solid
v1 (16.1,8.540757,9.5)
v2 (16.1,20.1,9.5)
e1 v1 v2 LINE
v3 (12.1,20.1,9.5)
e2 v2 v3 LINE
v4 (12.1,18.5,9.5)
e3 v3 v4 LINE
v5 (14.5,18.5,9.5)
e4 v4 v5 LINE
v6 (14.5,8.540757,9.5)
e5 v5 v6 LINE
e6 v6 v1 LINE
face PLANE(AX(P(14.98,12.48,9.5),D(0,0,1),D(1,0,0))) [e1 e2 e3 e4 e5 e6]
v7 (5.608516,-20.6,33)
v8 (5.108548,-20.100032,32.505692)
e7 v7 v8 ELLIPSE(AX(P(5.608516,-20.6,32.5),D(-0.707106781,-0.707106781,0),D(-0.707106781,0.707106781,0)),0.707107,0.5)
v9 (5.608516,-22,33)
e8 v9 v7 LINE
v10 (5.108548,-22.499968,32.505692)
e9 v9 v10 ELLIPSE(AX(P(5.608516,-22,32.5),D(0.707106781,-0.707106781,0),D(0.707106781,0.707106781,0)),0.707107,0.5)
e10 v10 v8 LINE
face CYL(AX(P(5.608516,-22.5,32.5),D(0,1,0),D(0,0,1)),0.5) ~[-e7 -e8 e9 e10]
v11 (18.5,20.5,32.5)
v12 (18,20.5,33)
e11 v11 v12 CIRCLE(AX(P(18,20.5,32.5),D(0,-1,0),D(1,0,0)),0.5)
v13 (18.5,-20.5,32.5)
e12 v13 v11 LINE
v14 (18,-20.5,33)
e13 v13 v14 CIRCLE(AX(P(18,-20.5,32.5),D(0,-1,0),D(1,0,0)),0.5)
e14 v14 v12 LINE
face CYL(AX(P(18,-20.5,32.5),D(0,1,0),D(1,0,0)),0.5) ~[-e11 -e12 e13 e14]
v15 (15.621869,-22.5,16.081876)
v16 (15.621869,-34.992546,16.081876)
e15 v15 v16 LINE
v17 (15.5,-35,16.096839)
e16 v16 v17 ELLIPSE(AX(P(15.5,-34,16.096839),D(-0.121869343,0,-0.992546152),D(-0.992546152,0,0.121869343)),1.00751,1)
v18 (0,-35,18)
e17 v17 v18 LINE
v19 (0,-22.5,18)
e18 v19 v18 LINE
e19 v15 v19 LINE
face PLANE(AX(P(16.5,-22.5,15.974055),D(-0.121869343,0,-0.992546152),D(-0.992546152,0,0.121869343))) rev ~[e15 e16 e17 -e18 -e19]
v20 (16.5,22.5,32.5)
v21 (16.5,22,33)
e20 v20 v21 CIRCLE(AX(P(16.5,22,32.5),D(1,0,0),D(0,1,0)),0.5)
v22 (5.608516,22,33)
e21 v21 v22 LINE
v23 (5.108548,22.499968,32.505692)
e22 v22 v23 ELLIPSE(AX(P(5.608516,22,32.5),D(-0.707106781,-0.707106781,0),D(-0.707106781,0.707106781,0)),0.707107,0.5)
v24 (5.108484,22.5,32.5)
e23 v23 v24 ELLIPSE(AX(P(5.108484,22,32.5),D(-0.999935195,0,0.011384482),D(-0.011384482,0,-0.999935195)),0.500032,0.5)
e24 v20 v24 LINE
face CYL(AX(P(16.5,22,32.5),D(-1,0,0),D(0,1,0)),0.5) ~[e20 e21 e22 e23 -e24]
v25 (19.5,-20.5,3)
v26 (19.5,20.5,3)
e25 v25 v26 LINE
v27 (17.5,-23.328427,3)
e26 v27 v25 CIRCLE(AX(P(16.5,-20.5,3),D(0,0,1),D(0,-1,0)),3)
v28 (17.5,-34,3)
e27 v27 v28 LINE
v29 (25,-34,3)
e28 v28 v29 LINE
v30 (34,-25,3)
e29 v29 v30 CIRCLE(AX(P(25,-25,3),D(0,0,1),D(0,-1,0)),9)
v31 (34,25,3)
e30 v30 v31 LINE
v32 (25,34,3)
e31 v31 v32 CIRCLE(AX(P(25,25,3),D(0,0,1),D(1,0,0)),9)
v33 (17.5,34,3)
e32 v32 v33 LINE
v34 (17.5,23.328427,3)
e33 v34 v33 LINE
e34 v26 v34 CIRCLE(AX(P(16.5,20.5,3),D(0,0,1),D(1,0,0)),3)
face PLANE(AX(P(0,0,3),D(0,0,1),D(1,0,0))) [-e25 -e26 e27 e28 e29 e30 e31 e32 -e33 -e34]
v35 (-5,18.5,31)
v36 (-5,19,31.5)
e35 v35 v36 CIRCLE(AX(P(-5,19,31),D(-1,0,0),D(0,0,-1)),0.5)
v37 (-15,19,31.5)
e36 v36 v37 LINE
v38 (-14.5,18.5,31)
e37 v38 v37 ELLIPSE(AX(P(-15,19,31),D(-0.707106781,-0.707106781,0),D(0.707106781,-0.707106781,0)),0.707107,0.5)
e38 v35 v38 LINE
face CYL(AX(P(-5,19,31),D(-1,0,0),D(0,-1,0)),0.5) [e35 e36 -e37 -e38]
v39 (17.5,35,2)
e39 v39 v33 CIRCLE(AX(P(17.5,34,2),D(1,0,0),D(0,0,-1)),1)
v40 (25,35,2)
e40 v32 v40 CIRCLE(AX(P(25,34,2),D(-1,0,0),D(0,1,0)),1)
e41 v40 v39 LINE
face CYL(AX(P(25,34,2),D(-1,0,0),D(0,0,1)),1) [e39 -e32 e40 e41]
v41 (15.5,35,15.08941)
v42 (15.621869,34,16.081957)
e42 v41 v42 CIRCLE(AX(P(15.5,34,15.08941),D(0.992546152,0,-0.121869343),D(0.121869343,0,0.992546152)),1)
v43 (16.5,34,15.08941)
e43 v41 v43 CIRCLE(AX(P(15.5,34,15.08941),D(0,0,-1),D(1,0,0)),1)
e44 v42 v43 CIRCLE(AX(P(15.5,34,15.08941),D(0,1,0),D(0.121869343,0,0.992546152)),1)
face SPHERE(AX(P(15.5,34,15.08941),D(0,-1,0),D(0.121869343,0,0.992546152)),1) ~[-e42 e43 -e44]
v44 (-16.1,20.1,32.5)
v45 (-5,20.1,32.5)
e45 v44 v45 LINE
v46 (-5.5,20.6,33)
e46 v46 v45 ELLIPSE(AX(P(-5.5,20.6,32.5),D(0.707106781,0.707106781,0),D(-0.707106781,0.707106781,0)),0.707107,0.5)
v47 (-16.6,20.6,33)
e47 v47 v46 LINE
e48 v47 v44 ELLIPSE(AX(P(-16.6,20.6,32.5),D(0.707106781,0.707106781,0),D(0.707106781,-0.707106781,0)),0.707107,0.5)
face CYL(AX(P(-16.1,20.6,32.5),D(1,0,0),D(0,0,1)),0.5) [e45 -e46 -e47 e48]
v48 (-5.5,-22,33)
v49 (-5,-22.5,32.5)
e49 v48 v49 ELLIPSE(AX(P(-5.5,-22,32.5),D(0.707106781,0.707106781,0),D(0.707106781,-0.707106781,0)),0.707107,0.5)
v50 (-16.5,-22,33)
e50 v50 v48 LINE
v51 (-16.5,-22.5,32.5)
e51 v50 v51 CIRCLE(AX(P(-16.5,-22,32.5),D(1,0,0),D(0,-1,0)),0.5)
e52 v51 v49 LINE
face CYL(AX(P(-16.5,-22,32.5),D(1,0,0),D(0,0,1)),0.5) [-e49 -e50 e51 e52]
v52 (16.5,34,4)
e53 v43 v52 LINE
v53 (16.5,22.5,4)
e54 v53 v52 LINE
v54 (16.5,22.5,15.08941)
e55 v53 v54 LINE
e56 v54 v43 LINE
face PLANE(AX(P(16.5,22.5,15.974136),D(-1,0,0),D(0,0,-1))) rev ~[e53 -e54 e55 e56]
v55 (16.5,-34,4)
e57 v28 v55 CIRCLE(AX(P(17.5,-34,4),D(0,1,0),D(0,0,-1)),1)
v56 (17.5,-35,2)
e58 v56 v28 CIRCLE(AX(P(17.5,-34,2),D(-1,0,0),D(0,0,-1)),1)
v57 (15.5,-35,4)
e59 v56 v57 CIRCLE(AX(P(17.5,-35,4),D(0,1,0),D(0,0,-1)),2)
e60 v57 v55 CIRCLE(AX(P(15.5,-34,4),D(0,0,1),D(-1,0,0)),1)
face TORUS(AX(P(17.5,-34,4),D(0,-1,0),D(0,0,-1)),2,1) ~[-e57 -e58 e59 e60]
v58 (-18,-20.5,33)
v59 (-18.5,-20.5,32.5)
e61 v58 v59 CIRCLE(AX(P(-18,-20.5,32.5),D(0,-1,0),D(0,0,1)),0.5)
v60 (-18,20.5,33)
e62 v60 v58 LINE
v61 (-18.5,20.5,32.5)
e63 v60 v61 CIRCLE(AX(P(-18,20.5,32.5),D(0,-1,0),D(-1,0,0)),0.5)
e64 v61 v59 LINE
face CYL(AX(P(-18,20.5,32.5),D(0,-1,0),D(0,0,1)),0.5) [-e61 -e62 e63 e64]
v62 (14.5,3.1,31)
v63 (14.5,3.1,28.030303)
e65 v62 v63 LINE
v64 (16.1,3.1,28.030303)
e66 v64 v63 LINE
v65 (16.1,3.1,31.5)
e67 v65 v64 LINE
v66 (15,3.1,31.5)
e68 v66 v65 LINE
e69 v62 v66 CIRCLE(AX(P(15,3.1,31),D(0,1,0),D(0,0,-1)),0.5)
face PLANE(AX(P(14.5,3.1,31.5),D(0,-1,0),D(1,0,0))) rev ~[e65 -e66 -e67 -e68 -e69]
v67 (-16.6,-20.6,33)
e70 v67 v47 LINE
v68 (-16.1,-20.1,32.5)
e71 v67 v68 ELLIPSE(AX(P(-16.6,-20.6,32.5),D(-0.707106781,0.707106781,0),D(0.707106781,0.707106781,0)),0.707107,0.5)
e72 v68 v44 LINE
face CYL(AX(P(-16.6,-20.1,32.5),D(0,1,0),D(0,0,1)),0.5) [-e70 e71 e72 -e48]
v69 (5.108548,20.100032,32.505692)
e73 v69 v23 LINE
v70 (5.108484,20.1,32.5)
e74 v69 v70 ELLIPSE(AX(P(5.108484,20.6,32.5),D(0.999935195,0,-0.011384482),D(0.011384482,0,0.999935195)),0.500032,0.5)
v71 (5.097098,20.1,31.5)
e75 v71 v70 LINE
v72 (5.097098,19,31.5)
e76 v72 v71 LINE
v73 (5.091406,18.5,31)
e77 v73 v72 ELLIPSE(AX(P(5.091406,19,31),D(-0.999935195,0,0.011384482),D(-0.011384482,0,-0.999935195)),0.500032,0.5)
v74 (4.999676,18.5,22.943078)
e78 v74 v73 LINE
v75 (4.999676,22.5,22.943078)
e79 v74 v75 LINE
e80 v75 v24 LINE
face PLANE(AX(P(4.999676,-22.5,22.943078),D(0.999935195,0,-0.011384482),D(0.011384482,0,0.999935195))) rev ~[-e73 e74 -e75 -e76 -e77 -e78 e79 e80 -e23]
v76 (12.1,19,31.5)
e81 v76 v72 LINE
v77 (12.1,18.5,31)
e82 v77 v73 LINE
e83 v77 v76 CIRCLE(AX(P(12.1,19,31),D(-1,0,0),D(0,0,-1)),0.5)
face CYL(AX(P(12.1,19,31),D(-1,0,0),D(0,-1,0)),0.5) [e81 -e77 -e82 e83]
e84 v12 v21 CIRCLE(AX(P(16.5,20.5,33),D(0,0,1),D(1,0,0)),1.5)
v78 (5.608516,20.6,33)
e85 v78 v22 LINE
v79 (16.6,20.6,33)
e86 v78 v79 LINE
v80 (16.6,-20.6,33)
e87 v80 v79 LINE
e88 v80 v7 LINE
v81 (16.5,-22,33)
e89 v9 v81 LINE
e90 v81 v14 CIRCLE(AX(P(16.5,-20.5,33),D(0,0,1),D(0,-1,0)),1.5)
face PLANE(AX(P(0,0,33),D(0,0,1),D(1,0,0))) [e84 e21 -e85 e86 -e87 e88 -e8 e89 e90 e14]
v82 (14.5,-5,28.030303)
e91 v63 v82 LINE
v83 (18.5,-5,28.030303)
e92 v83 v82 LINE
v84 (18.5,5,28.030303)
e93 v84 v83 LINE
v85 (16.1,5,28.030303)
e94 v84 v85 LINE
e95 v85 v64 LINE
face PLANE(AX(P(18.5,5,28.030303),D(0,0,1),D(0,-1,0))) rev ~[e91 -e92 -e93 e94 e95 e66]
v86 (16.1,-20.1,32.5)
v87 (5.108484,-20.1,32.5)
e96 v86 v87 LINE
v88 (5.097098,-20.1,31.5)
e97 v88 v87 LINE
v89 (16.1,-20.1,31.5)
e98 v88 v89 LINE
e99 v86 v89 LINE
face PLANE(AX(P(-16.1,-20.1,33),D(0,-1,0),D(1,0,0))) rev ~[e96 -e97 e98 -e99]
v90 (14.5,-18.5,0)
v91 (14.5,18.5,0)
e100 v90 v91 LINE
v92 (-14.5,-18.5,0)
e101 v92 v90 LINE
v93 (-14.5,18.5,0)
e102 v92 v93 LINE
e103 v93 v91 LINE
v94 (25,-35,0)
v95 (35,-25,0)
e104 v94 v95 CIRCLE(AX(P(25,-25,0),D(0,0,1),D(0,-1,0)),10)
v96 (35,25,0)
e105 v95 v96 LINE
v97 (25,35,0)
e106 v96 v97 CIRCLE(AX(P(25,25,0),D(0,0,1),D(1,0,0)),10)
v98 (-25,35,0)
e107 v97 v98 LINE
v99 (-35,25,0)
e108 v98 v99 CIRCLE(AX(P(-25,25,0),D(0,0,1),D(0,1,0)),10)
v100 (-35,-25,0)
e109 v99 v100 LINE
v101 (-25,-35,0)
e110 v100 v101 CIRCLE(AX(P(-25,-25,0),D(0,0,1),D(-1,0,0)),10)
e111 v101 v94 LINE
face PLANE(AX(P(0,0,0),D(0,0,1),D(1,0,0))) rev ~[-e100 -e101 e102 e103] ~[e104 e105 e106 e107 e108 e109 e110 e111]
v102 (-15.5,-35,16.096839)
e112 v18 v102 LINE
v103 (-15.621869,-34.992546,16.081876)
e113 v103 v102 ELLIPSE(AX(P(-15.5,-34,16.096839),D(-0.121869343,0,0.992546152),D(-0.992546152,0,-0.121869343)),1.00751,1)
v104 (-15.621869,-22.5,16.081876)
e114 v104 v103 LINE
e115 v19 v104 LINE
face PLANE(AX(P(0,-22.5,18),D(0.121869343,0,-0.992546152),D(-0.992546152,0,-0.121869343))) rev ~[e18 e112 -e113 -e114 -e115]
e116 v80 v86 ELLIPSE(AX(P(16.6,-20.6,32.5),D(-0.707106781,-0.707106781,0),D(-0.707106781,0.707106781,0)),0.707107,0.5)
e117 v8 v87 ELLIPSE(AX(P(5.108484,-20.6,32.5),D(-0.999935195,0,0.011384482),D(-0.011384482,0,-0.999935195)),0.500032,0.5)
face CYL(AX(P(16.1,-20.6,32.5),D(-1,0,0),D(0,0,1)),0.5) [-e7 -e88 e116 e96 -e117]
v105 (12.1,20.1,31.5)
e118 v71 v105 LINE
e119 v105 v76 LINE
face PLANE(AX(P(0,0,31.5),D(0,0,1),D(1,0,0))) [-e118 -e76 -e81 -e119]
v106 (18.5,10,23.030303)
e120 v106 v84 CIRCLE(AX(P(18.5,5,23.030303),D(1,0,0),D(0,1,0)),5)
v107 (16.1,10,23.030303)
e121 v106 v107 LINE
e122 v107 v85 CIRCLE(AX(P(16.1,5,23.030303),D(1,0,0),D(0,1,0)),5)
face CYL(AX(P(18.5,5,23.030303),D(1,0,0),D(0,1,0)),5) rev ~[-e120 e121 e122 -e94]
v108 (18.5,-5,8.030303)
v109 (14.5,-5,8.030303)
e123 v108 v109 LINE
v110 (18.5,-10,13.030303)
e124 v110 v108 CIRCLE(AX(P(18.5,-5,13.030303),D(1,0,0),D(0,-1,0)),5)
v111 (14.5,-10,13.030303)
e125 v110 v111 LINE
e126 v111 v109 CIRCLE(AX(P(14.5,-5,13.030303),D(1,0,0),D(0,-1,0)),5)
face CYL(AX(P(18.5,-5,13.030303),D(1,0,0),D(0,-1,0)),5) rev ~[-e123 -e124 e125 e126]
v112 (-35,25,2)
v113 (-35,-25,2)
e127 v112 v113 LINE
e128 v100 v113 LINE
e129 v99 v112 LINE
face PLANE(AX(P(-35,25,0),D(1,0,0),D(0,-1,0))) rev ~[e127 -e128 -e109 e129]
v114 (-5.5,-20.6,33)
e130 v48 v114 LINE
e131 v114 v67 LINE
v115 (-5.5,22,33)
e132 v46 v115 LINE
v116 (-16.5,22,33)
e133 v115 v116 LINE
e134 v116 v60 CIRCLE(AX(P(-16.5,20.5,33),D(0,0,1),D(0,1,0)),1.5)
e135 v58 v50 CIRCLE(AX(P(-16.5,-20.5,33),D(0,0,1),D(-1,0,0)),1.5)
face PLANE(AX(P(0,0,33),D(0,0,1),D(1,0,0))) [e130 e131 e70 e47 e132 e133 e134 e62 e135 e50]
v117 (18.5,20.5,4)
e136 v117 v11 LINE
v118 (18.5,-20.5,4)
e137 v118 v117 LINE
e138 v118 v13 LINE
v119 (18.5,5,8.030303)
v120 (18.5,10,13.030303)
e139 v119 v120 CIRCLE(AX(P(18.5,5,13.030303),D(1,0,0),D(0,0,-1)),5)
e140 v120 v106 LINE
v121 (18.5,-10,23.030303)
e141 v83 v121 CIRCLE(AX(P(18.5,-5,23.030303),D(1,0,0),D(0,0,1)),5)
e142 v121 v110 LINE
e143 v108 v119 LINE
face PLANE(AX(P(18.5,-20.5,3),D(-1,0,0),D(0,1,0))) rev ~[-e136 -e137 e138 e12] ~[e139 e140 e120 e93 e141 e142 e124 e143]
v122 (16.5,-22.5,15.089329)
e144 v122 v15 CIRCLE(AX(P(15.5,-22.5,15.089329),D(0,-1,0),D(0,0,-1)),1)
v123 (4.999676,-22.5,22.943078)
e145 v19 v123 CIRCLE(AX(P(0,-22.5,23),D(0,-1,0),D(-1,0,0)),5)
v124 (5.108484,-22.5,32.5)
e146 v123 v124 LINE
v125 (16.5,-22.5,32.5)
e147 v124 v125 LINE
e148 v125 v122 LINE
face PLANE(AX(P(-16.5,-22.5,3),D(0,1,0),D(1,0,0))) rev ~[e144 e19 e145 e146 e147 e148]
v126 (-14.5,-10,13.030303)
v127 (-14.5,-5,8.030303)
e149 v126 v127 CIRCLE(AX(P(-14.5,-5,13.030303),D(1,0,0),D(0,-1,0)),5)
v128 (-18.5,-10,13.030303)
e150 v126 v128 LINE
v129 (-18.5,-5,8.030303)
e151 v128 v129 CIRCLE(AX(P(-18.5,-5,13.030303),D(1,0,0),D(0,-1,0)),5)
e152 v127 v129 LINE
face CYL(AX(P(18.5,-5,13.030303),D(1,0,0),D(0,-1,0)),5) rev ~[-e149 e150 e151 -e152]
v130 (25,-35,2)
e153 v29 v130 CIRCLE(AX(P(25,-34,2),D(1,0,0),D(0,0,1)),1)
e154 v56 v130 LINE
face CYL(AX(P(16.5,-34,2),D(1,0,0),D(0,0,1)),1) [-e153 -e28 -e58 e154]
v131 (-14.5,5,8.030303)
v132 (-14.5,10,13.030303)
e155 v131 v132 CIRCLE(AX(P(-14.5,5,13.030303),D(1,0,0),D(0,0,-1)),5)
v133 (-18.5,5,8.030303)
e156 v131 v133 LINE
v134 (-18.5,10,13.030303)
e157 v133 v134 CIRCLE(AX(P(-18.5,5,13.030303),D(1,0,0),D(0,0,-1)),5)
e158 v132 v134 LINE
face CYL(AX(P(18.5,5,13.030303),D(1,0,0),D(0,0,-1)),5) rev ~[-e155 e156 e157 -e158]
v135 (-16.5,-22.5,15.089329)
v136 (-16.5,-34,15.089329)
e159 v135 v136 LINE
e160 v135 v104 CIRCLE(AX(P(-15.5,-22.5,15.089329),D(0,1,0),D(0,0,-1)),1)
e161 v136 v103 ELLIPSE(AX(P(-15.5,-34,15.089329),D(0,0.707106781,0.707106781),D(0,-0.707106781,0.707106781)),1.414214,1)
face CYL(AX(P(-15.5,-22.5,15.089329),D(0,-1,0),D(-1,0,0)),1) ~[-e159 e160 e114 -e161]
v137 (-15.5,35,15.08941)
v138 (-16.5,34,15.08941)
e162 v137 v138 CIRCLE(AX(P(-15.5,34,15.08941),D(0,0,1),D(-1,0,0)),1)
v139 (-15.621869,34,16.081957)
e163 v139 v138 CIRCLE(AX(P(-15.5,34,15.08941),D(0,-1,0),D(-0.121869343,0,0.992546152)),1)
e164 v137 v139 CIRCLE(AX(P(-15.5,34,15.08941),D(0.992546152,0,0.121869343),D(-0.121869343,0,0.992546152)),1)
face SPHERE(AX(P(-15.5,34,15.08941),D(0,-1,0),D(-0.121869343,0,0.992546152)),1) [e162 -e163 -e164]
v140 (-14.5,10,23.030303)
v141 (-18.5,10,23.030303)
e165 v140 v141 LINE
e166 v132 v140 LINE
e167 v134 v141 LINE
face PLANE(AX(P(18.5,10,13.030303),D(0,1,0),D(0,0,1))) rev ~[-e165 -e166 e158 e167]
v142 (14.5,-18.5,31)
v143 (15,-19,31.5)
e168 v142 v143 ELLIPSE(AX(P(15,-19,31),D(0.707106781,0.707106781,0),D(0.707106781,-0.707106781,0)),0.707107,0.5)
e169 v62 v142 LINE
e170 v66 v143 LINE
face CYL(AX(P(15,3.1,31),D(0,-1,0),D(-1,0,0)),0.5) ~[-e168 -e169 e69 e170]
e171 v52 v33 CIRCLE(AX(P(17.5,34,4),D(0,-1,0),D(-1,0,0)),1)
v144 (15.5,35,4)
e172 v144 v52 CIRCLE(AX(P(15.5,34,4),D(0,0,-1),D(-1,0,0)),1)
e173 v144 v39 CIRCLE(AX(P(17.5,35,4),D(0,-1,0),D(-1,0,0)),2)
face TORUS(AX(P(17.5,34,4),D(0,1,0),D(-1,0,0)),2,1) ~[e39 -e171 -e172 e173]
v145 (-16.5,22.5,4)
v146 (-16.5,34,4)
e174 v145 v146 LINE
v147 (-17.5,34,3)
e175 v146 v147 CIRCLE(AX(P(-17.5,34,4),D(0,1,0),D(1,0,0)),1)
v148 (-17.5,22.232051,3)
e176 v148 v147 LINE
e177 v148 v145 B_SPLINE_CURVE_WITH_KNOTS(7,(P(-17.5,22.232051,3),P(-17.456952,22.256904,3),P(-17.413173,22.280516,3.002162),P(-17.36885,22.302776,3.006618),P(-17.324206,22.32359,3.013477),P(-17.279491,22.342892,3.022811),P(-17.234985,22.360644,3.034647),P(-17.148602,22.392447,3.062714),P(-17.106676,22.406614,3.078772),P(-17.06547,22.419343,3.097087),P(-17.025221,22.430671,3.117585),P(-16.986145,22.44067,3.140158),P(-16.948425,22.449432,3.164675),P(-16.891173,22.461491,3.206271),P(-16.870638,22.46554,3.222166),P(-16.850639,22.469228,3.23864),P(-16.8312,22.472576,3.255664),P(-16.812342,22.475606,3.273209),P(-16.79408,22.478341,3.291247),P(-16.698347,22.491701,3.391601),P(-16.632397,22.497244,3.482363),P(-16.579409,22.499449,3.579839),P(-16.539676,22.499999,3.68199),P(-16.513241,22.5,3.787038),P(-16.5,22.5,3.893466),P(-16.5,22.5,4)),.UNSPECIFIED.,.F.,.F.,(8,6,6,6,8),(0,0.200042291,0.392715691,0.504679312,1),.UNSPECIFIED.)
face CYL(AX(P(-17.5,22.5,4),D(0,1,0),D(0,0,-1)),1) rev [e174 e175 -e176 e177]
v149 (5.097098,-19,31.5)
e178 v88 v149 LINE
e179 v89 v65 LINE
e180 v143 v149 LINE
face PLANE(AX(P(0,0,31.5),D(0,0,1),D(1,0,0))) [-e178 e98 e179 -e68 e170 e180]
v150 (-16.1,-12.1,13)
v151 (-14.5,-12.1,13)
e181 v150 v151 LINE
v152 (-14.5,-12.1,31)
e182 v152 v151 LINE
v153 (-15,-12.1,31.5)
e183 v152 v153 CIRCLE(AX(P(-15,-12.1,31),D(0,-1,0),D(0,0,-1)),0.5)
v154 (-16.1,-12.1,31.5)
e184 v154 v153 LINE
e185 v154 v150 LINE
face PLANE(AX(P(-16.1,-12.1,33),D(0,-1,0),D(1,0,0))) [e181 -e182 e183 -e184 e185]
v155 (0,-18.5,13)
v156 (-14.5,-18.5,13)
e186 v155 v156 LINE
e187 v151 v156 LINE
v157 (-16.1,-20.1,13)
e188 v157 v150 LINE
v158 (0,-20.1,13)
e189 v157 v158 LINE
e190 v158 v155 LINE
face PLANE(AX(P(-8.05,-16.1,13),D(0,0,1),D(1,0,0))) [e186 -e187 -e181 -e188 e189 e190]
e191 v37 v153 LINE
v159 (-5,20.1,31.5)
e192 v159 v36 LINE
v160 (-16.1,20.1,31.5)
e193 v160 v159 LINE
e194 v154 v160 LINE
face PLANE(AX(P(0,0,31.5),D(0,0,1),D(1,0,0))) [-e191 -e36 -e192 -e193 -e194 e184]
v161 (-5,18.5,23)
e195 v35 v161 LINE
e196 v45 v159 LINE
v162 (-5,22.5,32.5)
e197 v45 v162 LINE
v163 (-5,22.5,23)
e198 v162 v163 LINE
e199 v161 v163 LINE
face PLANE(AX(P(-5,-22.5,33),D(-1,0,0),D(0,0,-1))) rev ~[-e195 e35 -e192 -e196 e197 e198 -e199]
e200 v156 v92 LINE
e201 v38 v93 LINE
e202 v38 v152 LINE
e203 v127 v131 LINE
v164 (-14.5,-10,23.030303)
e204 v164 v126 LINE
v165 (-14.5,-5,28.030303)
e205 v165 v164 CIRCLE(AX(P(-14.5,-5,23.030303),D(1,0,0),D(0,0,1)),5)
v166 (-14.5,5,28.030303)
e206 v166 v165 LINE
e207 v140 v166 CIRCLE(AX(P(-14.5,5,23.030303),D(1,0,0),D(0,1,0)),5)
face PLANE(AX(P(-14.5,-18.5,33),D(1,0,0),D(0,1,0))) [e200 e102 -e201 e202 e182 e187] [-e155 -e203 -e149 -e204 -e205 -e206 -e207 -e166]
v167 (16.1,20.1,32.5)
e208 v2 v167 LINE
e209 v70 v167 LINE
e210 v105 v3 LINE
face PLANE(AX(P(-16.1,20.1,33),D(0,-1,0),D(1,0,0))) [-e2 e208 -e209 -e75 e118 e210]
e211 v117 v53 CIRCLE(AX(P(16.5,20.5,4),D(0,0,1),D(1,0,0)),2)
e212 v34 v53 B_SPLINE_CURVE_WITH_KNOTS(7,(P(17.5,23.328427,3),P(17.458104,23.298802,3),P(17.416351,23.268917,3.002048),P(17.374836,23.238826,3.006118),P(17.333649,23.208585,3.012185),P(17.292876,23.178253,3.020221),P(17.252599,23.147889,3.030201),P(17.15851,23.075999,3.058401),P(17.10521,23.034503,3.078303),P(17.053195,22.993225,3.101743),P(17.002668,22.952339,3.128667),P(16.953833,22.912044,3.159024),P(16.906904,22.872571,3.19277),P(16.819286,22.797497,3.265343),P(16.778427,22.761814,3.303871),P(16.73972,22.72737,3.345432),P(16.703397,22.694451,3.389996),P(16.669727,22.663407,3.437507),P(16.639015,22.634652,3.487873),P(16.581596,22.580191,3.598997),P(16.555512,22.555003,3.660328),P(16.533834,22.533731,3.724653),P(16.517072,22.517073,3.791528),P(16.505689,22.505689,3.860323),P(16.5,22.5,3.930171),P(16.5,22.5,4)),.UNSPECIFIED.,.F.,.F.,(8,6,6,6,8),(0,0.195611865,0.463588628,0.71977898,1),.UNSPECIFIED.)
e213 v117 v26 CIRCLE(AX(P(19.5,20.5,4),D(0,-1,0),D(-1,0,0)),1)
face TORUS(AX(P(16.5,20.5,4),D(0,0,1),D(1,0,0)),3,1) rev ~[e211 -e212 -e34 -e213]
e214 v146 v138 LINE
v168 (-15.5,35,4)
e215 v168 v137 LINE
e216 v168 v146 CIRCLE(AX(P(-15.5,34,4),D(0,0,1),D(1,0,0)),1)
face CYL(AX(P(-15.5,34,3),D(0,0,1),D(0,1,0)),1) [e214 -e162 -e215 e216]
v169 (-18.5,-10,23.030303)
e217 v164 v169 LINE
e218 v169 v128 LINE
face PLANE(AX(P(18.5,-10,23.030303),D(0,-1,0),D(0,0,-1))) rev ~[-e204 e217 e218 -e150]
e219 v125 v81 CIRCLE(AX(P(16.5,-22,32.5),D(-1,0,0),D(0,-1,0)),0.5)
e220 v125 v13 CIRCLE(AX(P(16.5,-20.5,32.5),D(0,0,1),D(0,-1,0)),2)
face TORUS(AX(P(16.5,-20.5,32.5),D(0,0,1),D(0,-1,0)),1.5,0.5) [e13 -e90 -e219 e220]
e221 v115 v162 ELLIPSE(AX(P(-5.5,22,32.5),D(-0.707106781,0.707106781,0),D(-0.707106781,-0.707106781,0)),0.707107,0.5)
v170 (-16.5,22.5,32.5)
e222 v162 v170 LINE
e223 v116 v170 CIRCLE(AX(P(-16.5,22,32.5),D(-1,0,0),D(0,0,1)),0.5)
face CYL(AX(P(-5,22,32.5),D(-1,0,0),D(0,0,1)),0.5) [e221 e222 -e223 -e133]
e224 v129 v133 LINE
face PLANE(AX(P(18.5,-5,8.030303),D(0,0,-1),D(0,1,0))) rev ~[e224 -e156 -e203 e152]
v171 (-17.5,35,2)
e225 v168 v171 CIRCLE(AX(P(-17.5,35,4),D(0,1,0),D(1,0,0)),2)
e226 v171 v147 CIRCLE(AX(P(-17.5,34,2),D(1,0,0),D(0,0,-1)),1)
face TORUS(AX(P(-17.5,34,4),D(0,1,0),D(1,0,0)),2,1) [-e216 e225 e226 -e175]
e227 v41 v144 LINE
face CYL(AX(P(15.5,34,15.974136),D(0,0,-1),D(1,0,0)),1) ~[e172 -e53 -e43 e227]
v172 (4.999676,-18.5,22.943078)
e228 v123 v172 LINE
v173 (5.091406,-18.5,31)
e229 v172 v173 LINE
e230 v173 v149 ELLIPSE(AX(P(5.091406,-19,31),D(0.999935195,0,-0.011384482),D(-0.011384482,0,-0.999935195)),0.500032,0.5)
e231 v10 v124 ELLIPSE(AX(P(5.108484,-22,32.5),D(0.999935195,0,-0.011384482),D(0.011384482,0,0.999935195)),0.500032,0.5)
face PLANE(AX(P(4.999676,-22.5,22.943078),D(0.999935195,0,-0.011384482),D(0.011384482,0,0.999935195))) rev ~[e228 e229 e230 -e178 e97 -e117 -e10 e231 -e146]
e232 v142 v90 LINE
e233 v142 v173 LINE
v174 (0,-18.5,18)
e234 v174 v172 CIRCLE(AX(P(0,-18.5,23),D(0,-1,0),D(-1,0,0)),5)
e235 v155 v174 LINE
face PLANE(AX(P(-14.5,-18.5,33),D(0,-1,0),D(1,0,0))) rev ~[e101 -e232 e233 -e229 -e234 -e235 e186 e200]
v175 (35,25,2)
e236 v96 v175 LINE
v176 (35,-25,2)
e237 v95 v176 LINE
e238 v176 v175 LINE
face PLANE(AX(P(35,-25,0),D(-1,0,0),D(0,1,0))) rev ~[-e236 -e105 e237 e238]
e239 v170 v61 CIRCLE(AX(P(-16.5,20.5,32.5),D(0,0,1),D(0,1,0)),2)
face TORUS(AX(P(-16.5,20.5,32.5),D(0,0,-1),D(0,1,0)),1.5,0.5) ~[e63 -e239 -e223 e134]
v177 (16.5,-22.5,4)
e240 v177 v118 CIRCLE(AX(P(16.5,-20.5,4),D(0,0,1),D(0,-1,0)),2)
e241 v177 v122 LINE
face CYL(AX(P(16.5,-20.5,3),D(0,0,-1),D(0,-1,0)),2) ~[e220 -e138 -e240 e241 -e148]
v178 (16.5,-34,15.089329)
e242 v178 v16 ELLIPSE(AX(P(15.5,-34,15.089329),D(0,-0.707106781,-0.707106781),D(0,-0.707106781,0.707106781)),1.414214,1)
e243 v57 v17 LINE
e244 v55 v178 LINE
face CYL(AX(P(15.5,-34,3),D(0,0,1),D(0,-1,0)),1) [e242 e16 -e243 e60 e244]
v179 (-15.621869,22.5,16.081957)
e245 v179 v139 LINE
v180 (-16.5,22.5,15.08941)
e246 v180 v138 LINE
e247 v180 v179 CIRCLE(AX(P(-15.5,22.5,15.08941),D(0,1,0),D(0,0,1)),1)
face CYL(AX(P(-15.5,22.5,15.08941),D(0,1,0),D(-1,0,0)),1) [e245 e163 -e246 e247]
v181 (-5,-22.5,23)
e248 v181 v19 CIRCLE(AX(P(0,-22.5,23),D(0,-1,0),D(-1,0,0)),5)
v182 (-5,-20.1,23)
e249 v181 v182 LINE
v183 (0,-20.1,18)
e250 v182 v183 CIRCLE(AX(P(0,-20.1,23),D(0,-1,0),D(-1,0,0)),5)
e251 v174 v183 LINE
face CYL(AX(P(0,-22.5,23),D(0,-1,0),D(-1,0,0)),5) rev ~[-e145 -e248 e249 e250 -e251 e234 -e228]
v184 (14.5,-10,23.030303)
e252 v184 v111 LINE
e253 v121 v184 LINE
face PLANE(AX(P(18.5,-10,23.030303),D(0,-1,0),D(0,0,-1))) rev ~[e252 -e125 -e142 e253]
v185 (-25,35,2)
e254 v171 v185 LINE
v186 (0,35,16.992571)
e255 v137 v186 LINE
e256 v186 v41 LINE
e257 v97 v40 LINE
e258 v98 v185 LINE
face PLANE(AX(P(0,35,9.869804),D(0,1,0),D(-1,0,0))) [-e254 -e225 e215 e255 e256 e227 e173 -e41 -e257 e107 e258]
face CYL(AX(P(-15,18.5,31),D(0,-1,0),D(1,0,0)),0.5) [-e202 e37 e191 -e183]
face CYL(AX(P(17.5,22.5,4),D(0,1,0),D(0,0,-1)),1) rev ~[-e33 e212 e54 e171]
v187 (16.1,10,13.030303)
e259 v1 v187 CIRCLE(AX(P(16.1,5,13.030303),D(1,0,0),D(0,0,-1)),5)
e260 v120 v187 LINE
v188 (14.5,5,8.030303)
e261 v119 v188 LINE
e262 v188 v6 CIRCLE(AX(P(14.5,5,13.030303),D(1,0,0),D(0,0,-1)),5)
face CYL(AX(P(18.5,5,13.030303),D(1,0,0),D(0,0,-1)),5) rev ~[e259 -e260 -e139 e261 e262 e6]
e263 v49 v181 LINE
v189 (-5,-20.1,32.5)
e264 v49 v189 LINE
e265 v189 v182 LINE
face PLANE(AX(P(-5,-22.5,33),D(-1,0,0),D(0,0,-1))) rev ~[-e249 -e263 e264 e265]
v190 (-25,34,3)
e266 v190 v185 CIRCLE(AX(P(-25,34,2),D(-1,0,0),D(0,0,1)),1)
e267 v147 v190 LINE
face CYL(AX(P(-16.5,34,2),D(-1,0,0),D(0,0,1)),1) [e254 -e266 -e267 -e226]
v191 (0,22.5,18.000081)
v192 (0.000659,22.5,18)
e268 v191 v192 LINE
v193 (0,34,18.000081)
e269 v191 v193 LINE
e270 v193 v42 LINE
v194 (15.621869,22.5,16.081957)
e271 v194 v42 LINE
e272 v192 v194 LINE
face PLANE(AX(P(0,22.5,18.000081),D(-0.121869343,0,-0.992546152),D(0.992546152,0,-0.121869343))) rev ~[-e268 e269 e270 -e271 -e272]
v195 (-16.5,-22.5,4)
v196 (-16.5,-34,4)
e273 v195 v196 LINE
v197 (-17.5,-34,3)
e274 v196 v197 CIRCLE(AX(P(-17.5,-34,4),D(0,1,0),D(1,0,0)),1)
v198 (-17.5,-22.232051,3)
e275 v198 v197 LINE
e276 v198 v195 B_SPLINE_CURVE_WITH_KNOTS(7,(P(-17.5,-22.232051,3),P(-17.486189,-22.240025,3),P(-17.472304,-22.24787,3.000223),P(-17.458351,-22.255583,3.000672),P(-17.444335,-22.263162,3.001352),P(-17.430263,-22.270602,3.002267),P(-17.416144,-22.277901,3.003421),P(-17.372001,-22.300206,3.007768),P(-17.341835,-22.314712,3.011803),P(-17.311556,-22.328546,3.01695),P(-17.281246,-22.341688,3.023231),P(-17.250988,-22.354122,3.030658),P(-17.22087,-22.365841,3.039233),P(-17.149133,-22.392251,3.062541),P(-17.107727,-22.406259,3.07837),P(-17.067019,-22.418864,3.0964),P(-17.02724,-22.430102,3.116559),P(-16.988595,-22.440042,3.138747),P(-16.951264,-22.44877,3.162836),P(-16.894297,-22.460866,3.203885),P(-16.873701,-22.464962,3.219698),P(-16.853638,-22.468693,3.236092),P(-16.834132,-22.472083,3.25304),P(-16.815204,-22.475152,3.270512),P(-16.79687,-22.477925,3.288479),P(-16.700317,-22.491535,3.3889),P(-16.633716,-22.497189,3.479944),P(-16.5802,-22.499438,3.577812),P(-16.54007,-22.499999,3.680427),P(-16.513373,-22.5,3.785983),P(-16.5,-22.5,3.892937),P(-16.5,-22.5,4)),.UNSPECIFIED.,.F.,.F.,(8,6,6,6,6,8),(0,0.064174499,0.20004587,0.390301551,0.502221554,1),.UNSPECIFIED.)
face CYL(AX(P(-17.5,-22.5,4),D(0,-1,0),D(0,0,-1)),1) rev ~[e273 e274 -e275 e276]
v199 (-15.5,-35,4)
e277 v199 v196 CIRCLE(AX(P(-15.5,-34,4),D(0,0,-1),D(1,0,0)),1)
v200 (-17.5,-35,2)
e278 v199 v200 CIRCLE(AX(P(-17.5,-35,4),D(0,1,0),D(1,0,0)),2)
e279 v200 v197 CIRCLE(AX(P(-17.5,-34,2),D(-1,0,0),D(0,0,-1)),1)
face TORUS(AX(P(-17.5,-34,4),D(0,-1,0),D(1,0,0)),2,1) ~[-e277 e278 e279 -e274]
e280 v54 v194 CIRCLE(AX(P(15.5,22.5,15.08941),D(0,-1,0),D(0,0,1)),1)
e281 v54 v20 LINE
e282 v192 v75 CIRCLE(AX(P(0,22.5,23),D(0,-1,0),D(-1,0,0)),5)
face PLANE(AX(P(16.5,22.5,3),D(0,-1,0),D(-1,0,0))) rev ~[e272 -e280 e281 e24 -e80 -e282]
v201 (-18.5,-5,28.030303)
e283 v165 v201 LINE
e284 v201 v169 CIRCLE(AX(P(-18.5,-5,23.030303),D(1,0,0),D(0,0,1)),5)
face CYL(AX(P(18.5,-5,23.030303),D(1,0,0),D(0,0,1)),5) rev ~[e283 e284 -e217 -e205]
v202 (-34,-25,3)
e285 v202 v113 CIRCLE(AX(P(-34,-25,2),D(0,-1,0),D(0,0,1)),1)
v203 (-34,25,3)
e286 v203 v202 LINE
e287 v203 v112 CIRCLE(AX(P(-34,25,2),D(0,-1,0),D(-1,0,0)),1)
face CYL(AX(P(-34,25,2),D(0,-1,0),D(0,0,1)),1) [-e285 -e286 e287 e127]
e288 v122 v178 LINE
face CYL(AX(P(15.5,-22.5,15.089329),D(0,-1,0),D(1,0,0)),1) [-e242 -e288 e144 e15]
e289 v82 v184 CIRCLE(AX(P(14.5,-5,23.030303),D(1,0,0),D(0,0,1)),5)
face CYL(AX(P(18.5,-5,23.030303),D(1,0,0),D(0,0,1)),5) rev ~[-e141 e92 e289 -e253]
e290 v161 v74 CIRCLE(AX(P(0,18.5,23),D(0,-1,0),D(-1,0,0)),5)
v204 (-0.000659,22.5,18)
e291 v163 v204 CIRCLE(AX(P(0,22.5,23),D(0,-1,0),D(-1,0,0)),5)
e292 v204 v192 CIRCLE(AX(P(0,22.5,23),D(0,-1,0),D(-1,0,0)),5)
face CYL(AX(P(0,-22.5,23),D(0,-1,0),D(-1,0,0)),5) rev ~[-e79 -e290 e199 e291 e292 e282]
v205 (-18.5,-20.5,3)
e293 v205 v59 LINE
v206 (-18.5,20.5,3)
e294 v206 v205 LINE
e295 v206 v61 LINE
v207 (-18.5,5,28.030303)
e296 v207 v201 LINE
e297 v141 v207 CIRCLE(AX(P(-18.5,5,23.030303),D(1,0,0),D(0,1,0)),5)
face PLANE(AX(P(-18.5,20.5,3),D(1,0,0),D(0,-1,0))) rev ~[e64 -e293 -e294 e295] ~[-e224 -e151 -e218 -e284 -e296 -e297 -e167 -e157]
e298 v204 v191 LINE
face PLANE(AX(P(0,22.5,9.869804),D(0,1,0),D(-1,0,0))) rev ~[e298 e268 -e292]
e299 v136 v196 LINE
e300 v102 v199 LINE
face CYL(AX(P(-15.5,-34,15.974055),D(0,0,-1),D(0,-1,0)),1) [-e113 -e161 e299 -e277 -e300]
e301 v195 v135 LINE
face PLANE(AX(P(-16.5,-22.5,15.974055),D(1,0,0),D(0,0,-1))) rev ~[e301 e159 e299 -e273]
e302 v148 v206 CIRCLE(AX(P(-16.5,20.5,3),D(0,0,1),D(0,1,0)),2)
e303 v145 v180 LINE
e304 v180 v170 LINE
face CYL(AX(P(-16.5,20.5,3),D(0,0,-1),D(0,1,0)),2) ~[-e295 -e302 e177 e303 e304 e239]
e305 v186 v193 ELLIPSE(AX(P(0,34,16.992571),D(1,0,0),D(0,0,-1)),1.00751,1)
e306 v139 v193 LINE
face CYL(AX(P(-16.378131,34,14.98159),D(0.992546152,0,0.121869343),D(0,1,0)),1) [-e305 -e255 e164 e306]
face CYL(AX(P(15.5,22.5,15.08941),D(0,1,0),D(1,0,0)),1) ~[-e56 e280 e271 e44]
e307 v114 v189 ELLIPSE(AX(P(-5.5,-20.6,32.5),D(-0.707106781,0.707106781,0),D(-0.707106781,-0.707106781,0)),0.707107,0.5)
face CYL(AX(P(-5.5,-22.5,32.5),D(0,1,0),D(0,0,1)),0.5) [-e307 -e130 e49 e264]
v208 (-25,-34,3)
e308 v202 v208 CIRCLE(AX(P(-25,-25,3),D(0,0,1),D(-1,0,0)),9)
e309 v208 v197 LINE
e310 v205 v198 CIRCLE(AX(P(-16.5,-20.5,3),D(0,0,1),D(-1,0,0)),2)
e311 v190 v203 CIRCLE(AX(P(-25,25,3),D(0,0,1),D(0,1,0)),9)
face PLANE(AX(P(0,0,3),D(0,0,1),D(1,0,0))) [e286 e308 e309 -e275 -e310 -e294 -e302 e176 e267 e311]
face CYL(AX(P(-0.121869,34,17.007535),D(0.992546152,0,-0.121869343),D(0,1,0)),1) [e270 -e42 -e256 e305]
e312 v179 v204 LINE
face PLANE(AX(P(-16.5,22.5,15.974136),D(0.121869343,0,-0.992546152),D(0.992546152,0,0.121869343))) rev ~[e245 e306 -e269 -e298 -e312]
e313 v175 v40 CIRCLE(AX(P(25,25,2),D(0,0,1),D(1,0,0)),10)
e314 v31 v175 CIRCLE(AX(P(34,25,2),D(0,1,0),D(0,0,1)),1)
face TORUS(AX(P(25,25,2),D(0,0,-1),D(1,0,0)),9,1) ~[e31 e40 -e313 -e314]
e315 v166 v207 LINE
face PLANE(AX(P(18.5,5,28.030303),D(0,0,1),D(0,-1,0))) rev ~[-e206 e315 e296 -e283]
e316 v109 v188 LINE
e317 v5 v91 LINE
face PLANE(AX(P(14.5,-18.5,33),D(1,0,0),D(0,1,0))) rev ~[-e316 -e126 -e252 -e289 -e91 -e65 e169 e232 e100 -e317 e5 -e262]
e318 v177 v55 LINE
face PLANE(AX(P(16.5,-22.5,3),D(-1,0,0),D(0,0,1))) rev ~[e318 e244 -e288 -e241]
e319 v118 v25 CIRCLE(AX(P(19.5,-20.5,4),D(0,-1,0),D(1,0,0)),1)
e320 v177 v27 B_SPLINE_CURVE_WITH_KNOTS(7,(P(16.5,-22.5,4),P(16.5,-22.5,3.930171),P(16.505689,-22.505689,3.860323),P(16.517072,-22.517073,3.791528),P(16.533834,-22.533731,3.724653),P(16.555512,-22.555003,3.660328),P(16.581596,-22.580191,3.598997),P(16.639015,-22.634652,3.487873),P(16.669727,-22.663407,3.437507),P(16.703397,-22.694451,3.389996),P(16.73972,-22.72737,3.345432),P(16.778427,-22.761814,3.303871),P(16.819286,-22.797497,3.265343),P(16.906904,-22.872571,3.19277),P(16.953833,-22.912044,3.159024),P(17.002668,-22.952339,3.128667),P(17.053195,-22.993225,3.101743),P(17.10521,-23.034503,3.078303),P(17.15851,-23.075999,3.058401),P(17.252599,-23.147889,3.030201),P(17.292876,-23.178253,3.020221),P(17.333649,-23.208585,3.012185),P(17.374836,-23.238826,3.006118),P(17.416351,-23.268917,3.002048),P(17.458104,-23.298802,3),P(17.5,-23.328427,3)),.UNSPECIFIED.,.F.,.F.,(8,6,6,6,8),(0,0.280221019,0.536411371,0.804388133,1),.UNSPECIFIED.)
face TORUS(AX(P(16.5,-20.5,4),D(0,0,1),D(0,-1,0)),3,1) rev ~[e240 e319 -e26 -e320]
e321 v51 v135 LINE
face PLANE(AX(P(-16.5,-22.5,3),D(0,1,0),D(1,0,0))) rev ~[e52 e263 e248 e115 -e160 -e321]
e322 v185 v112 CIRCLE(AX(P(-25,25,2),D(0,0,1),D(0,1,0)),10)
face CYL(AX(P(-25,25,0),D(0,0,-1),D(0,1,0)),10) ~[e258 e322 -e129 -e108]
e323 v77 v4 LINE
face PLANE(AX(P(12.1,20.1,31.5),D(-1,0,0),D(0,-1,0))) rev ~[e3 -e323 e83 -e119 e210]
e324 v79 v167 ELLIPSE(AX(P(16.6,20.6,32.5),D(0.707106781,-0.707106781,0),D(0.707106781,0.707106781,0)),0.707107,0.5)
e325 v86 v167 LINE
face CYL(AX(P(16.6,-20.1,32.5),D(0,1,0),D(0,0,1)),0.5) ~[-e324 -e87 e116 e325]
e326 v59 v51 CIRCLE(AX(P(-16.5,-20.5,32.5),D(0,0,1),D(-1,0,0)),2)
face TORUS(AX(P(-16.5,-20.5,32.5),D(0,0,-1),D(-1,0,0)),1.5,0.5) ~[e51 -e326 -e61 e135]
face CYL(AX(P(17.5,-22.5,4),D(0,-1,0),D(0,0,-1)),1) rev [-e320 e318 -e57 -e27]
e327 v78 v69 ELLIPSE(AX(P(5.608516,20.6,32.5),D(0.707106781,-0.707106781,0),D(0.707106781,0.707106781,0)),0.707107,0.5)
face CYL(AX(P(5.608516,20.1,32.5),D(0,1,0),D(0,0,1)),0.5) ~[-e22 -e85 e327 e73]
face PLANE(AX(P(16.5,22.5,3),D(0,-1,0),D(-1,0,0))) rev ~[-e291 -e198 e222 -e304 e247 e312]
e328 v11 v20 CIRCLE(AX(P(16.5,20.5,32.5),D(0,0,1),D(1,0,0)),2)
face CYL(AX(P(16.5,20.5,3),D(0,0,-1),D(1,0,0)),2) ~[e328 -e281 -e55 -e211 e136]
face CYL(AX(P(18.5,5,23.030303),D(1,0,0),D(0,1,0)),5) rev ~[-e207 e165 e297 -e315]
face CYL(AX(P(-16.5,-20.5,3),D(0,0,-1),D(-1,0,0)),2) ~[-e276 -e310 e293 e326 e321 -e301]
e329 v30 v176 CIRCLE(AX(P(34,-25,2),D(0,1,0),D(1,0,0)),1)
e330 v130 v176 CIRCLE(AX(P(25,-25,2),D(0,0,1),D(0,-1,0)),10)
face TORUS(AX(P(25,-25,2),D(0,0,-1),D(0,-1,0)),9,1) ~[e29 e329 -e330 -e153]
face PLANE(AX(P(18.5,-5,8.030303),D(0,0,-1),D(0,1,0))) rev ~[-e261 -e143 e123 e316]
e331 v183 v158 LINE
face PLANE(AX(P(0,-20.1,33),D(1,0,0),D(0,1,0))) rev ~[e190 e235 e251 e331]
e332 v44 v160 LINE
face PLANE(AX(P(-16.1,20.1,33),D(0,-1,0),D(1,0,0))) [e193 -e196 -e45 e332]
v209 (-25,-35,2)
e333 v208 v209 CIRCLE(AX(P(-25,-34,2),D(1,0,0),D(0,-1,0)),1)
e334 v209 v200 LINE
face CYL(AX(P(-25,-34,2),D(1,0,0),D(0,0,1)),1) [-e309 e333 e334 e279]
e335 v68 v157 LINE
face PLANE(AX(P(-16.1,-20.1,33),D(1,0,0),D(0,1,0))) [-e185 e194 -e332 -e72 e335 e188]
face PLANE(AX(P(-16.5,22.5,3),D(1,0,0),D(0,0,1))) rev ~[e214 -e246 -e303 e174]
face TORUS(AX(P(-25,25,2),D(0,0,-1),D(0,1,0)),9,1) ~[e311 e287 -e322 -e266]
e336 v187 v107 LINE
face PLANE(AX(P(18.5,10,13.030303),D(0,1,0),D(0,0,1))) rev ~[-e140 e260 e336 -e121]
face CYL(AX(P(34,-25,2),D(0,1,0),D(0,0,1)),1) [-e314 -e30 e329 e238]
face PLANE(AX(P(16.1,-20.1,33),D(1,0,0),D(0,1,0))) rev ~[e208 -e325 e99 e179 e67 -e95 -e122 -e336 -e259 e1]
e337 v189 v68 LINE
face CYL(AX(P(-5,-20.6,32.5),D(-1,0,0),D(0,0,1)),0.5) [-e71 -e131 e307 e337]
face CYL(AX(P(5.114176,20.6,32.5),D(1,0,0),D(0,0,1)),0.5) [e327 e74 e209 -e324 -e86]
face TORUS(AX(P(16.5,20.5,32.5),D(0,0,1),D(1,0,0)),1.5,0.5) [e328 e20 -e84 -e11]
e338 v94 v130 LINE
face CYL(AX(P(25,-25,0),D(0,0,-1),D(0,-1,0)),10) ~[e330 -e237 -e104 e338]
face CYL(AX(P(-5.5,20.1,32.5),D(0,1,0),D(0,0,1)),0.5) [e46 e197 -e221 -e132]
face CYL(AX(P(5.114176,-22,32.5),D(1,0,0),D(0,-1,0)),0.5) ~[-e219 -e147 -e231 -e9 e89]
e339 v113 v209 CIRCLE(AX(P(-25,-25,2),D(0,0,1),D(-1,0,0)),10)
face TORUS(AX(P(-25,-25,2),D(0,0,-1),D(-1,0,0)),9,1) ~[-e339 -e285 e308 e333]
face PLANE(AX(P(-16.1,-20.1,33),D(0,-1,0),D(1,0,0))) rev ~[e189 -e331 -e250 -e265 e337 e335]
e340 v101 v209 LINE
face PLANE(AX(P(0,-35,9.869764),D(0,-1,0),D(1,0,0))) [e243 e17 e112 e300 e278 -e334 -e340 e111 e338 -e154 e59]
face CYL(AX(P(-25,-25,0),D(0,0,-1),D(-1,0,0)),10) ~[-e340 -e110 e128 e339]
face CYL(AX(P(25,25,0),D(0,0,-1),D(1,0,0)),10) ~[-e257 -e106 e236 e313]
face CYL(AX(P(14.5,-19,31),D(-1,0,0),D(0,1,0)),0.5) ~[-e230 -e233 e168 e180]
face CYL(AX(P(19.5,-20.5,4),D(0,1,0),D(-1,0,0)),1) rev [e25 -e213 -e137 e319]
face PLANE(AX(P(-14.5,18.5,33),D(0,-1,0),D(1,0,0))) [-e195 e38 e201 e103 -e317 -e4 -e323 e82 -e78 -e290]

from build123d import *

# Parameters (mm, degrees)
F1_DEPTH       = 3
F3_DEPTH       = 30
F4_W           = 29
F4_H           = 37
F5_DEPTH       = 33.001
F6_W           = 32.2
F6_H           = 40.2
F7_DEPTH       = 1.5
F9_DEPTH       = 22
F10_W          = 16.1
F10_H          = 8
F11_DEPTH      = 20
F13_DEPTH      = 53.501
F13_DEPTH_BACK = 16.501
F15_DEPTH      = 57.501
F17_DEPTH      = 12.5
F19_DEPTH      = 12.5
F20_R          = 0.5
F21_R          = 1


with BuildPart() as f1:
    # F0 (on Top) → F1 (new body)
    with BuildSketch(Plane.XY):
        with BuildLine():
            Line((-25, -35), (25, -35))
            ThreePointArc((25, -35), (32.0710678119, -32.0710678119), (35, -25))
            Line((35, -25), (35, 25))
            ThreePointArc((35, 25), (32.0710678119, 32.0710678119), (25, 35))
            Line((25, 35), (-25, 35))
            ThreePointArc((-25, 35), (-32.0710678119, 32.0710678119), (-35, 25))
            Line((-35, 25), (-35, -25))
            ThreePointArc((-35, -25), (-32.0710678119, -32.0710678119), (-25, -35))
        make_face()
    extrude(amount=F1_DEPTH)

    # F2 (on face) → F3 (join)
    with BuildSketch(Plane.XY.offset(3)):
        with BuildLine():
            Line((-16.5, -22.5), (16.5, -22.5))
            ThreePointArc((16.5, -22.5), (17.9142135624, -21.9142135624), (18.5, -20.5))
            Line((18.5, -20.5), (18.5, 20.5))
            ThreePointArc((18.5, 20.5), (17.9142135624, 21.9142135624), (16.5, 22.5))
            Line((16.5, 22.5), (-16.5, 22.5))
            ThreePointArc((-16.5, 22.5), (-17.9142135624, 21.9142135624), (-18.5, 20.5))
            Line((-18.5, 20.5), (-18.5, -20.5))
            ThreePointArc((-18.5, -20.5), (-17.9142135624, -21.9142135624), (-16.5, -22.5))
        make_face()
    extrude(amount=F3_DEPTH)

    # F4 (on face) → F5 (cut, through all)
    with BuildSketch(Plane.XY.offset(33)):
        Rectangle(F4_W, F4_H)
    extrude(amount=-F5_DEPTH, mode=Mode.SUBTRACT)

    # F6 (on face) → F7 (cut)
    with BuildSketch(Plane.XY.offset(33)):
        Rectangle(F6_W, F6_H)
    extrude(amount=-F7_DEPTH, mode=Mode.SUBTRACT)

    # F8 (on face) → F9 (cut)
    with BuildSketch(Plane.XY.offset(31.5)):
        Polygon((16.1, 20.1), (12.1, 20.1), (12.1, 18.5), (14.5, 18.5), (14.5, 3.1), (16.1, 3.1), align=None)
    extrude(amount=-F9_DEPTH, mode=Mode.SUBTRACT)

    # F10 (on face) → F11 (cut)
    with BuildSketch(Plane.XY.offset(33)):
        with Locations((-8.05, -16.1)):
            Rectangle(F10_W, F10_H)
    extrude(amount=-F11_DEPTH, mode=Mode.SUBTRACT)

    # F12 (on face) → F13 (cut, two sides)
    with BuildSketch(Plane.YZ.offset(18.5)) as f13_sk:
        with BuildLine():
            Line((-5, 8.030303205), (5, 8.030303205))
            ThreePointArc((5, 8.030303205), (8.5355339059, 9.4947692991), (10, 13.030303205))
            Line((10, 13.030303205), (10, 23.030303205))
            ThreePointArc((10, 23.030303205), (8.5355339059, 26.5658371109), (5, 28.030303205))
            Line((5, 28.030303205), (-5, 28.030303205))
            ThreePointArc((-5, 28.030303205), (-8.5355339059, 26.5658371109), (-10, 23.030303205))
            Line((-10, 23.030303205), (-10, 13.030303205))
            ThreePointArc((-10, 13.030303205), (-8.5355339059, 9.4947692991), (-5, 8.030303205))
        make_face()
    extrude(amount=-F13_DEPTH, mode=Mode.SUBTRACT)
    extrude(f13_sk.sketch, amount=F13_DEPTH_BACK, mode=Mode.SUBTRACT)

    # F14 (on face) → F15 (cut, through all)
    with BuildSketch(Plane.XZ.offset(22.5)):
        with BuildLine():
            Line((-5, 33), (-5, 23))
            ThreePointArc((-5, 23), (-0.0284616664, 18.0000810073), (4.9996759734, 22.9430775894))
            Line((4.9996759734, 22.9430775894), (5.114176247, 33))
            Line((5.114176247, 33), (-5, 33))
        make_face()
    extrude(amount=-F15_DEPTH, mode=Mode.SUBTRACT)

    # F16 (on face) → F17 (join, through all)
    with BuildSketch(Plane.XZ.offset(22.5)):
        Polygon((-16.5, 15.9740547451), (-16.5, 3), (16.5, 3), (16.5, 15.9740547451), (0, 18), align=None)
    extrude(amount=F17_DEPTH)

    # F18 (on face) → F19 (join, through all)
    with BuildSketch(Plane(origin=(0, 22.5, 0), x_dir=(-1, 0, 0), z_dir=(0, 1, 0))):
        Polygon((-16.5, 15.9741357524), (-16.5, 3), (16.5, 3), (16.5, 15.9741357524), (0, 18.0000810073), align=None)
    extrude(amount=F19_DEPTH)

    # F20
    f20_edges = [f1.edges().sort_by_distance(p)[0] for p in [
        (5.114176, -21.3, 33),
        (10.607088, -20.1, 33),
        (16.1, 0, 33),
        (10.607088, 20.1, 33),
        (5.114176, 21.3, 33),
        (10.807088, 22.5, 33),
        (17.914214, 21.914214, 33),
        (18.5, 0, 33),
        (17.914214, -21.914214, 33),
        (10.807088, -22.5, 33),
        (-17.914214, -21.914214, 33),
        (-18.5, 0, 33),
        (-17.914214, 21.914214, 33),
        (-10.75, 22.5, 33),
        (-5, 21.3, 33),
        (-10.55, 20.1, 33),
        (-16.1, 0, 33),
        (-10.55, -20.1, 33),
        (-5, -21.3, 33),
        (-10.75, -22.5, 33),
        (14.5, -7.7, 31.5),
        (9.798549, -18.5, 31.5),
        (-14.5, 3.2, 31.5),
        (-9.75, 18.5, 31.5),
        (8.598549, 18.5, 31.5),
    ]]
    fillet(f20_edges, radius=F20_R)

    # F21
    f21_edges = [f1.edges().sort_by_distance(p)[0] for p in [
        (16.5, 28.75, 3),
        (8.25, 35, 16.987108),
        (-8.25, 35, 16.987108),
        (-16.5, 28.75, 3),
        (-16.5, 35, 9.487068),
        (16.5, 35, 9.487068),
        (18.5, 0, 3),
        (16.5, -28.75, 3),
        (-16.5, -28.75, 3),
        (-16.5, -35, 9.487027),
        (-16.5, 28.75, 15.974136),
        (-35, 0, 3),
        (-32.071068, 32.071068, 3),
        (-20.75, 35, 3),
        (-20.75, -35, 3),
        (-32.071068, -32.071068, 3),
        (20.75, 35, 3),
        (-16.5, -28.75, 15.974055),
        (16.5, -35, 9.487027),
        (20.75, -35, 3),
        (16.5, 28.75, 15.974136),
        (32.071068, 32.071068, 3),
        (35, 0, 3),
        (32.071068, -32.071068, 3),
        (17.914214, -21.914214, 3),
        (17.914214, 21.914214, 3),
        (16.5, -28.75, 15.974055),
    ]]
    fillet(f21_edges, radius=F21_R)


solid = f1.part
